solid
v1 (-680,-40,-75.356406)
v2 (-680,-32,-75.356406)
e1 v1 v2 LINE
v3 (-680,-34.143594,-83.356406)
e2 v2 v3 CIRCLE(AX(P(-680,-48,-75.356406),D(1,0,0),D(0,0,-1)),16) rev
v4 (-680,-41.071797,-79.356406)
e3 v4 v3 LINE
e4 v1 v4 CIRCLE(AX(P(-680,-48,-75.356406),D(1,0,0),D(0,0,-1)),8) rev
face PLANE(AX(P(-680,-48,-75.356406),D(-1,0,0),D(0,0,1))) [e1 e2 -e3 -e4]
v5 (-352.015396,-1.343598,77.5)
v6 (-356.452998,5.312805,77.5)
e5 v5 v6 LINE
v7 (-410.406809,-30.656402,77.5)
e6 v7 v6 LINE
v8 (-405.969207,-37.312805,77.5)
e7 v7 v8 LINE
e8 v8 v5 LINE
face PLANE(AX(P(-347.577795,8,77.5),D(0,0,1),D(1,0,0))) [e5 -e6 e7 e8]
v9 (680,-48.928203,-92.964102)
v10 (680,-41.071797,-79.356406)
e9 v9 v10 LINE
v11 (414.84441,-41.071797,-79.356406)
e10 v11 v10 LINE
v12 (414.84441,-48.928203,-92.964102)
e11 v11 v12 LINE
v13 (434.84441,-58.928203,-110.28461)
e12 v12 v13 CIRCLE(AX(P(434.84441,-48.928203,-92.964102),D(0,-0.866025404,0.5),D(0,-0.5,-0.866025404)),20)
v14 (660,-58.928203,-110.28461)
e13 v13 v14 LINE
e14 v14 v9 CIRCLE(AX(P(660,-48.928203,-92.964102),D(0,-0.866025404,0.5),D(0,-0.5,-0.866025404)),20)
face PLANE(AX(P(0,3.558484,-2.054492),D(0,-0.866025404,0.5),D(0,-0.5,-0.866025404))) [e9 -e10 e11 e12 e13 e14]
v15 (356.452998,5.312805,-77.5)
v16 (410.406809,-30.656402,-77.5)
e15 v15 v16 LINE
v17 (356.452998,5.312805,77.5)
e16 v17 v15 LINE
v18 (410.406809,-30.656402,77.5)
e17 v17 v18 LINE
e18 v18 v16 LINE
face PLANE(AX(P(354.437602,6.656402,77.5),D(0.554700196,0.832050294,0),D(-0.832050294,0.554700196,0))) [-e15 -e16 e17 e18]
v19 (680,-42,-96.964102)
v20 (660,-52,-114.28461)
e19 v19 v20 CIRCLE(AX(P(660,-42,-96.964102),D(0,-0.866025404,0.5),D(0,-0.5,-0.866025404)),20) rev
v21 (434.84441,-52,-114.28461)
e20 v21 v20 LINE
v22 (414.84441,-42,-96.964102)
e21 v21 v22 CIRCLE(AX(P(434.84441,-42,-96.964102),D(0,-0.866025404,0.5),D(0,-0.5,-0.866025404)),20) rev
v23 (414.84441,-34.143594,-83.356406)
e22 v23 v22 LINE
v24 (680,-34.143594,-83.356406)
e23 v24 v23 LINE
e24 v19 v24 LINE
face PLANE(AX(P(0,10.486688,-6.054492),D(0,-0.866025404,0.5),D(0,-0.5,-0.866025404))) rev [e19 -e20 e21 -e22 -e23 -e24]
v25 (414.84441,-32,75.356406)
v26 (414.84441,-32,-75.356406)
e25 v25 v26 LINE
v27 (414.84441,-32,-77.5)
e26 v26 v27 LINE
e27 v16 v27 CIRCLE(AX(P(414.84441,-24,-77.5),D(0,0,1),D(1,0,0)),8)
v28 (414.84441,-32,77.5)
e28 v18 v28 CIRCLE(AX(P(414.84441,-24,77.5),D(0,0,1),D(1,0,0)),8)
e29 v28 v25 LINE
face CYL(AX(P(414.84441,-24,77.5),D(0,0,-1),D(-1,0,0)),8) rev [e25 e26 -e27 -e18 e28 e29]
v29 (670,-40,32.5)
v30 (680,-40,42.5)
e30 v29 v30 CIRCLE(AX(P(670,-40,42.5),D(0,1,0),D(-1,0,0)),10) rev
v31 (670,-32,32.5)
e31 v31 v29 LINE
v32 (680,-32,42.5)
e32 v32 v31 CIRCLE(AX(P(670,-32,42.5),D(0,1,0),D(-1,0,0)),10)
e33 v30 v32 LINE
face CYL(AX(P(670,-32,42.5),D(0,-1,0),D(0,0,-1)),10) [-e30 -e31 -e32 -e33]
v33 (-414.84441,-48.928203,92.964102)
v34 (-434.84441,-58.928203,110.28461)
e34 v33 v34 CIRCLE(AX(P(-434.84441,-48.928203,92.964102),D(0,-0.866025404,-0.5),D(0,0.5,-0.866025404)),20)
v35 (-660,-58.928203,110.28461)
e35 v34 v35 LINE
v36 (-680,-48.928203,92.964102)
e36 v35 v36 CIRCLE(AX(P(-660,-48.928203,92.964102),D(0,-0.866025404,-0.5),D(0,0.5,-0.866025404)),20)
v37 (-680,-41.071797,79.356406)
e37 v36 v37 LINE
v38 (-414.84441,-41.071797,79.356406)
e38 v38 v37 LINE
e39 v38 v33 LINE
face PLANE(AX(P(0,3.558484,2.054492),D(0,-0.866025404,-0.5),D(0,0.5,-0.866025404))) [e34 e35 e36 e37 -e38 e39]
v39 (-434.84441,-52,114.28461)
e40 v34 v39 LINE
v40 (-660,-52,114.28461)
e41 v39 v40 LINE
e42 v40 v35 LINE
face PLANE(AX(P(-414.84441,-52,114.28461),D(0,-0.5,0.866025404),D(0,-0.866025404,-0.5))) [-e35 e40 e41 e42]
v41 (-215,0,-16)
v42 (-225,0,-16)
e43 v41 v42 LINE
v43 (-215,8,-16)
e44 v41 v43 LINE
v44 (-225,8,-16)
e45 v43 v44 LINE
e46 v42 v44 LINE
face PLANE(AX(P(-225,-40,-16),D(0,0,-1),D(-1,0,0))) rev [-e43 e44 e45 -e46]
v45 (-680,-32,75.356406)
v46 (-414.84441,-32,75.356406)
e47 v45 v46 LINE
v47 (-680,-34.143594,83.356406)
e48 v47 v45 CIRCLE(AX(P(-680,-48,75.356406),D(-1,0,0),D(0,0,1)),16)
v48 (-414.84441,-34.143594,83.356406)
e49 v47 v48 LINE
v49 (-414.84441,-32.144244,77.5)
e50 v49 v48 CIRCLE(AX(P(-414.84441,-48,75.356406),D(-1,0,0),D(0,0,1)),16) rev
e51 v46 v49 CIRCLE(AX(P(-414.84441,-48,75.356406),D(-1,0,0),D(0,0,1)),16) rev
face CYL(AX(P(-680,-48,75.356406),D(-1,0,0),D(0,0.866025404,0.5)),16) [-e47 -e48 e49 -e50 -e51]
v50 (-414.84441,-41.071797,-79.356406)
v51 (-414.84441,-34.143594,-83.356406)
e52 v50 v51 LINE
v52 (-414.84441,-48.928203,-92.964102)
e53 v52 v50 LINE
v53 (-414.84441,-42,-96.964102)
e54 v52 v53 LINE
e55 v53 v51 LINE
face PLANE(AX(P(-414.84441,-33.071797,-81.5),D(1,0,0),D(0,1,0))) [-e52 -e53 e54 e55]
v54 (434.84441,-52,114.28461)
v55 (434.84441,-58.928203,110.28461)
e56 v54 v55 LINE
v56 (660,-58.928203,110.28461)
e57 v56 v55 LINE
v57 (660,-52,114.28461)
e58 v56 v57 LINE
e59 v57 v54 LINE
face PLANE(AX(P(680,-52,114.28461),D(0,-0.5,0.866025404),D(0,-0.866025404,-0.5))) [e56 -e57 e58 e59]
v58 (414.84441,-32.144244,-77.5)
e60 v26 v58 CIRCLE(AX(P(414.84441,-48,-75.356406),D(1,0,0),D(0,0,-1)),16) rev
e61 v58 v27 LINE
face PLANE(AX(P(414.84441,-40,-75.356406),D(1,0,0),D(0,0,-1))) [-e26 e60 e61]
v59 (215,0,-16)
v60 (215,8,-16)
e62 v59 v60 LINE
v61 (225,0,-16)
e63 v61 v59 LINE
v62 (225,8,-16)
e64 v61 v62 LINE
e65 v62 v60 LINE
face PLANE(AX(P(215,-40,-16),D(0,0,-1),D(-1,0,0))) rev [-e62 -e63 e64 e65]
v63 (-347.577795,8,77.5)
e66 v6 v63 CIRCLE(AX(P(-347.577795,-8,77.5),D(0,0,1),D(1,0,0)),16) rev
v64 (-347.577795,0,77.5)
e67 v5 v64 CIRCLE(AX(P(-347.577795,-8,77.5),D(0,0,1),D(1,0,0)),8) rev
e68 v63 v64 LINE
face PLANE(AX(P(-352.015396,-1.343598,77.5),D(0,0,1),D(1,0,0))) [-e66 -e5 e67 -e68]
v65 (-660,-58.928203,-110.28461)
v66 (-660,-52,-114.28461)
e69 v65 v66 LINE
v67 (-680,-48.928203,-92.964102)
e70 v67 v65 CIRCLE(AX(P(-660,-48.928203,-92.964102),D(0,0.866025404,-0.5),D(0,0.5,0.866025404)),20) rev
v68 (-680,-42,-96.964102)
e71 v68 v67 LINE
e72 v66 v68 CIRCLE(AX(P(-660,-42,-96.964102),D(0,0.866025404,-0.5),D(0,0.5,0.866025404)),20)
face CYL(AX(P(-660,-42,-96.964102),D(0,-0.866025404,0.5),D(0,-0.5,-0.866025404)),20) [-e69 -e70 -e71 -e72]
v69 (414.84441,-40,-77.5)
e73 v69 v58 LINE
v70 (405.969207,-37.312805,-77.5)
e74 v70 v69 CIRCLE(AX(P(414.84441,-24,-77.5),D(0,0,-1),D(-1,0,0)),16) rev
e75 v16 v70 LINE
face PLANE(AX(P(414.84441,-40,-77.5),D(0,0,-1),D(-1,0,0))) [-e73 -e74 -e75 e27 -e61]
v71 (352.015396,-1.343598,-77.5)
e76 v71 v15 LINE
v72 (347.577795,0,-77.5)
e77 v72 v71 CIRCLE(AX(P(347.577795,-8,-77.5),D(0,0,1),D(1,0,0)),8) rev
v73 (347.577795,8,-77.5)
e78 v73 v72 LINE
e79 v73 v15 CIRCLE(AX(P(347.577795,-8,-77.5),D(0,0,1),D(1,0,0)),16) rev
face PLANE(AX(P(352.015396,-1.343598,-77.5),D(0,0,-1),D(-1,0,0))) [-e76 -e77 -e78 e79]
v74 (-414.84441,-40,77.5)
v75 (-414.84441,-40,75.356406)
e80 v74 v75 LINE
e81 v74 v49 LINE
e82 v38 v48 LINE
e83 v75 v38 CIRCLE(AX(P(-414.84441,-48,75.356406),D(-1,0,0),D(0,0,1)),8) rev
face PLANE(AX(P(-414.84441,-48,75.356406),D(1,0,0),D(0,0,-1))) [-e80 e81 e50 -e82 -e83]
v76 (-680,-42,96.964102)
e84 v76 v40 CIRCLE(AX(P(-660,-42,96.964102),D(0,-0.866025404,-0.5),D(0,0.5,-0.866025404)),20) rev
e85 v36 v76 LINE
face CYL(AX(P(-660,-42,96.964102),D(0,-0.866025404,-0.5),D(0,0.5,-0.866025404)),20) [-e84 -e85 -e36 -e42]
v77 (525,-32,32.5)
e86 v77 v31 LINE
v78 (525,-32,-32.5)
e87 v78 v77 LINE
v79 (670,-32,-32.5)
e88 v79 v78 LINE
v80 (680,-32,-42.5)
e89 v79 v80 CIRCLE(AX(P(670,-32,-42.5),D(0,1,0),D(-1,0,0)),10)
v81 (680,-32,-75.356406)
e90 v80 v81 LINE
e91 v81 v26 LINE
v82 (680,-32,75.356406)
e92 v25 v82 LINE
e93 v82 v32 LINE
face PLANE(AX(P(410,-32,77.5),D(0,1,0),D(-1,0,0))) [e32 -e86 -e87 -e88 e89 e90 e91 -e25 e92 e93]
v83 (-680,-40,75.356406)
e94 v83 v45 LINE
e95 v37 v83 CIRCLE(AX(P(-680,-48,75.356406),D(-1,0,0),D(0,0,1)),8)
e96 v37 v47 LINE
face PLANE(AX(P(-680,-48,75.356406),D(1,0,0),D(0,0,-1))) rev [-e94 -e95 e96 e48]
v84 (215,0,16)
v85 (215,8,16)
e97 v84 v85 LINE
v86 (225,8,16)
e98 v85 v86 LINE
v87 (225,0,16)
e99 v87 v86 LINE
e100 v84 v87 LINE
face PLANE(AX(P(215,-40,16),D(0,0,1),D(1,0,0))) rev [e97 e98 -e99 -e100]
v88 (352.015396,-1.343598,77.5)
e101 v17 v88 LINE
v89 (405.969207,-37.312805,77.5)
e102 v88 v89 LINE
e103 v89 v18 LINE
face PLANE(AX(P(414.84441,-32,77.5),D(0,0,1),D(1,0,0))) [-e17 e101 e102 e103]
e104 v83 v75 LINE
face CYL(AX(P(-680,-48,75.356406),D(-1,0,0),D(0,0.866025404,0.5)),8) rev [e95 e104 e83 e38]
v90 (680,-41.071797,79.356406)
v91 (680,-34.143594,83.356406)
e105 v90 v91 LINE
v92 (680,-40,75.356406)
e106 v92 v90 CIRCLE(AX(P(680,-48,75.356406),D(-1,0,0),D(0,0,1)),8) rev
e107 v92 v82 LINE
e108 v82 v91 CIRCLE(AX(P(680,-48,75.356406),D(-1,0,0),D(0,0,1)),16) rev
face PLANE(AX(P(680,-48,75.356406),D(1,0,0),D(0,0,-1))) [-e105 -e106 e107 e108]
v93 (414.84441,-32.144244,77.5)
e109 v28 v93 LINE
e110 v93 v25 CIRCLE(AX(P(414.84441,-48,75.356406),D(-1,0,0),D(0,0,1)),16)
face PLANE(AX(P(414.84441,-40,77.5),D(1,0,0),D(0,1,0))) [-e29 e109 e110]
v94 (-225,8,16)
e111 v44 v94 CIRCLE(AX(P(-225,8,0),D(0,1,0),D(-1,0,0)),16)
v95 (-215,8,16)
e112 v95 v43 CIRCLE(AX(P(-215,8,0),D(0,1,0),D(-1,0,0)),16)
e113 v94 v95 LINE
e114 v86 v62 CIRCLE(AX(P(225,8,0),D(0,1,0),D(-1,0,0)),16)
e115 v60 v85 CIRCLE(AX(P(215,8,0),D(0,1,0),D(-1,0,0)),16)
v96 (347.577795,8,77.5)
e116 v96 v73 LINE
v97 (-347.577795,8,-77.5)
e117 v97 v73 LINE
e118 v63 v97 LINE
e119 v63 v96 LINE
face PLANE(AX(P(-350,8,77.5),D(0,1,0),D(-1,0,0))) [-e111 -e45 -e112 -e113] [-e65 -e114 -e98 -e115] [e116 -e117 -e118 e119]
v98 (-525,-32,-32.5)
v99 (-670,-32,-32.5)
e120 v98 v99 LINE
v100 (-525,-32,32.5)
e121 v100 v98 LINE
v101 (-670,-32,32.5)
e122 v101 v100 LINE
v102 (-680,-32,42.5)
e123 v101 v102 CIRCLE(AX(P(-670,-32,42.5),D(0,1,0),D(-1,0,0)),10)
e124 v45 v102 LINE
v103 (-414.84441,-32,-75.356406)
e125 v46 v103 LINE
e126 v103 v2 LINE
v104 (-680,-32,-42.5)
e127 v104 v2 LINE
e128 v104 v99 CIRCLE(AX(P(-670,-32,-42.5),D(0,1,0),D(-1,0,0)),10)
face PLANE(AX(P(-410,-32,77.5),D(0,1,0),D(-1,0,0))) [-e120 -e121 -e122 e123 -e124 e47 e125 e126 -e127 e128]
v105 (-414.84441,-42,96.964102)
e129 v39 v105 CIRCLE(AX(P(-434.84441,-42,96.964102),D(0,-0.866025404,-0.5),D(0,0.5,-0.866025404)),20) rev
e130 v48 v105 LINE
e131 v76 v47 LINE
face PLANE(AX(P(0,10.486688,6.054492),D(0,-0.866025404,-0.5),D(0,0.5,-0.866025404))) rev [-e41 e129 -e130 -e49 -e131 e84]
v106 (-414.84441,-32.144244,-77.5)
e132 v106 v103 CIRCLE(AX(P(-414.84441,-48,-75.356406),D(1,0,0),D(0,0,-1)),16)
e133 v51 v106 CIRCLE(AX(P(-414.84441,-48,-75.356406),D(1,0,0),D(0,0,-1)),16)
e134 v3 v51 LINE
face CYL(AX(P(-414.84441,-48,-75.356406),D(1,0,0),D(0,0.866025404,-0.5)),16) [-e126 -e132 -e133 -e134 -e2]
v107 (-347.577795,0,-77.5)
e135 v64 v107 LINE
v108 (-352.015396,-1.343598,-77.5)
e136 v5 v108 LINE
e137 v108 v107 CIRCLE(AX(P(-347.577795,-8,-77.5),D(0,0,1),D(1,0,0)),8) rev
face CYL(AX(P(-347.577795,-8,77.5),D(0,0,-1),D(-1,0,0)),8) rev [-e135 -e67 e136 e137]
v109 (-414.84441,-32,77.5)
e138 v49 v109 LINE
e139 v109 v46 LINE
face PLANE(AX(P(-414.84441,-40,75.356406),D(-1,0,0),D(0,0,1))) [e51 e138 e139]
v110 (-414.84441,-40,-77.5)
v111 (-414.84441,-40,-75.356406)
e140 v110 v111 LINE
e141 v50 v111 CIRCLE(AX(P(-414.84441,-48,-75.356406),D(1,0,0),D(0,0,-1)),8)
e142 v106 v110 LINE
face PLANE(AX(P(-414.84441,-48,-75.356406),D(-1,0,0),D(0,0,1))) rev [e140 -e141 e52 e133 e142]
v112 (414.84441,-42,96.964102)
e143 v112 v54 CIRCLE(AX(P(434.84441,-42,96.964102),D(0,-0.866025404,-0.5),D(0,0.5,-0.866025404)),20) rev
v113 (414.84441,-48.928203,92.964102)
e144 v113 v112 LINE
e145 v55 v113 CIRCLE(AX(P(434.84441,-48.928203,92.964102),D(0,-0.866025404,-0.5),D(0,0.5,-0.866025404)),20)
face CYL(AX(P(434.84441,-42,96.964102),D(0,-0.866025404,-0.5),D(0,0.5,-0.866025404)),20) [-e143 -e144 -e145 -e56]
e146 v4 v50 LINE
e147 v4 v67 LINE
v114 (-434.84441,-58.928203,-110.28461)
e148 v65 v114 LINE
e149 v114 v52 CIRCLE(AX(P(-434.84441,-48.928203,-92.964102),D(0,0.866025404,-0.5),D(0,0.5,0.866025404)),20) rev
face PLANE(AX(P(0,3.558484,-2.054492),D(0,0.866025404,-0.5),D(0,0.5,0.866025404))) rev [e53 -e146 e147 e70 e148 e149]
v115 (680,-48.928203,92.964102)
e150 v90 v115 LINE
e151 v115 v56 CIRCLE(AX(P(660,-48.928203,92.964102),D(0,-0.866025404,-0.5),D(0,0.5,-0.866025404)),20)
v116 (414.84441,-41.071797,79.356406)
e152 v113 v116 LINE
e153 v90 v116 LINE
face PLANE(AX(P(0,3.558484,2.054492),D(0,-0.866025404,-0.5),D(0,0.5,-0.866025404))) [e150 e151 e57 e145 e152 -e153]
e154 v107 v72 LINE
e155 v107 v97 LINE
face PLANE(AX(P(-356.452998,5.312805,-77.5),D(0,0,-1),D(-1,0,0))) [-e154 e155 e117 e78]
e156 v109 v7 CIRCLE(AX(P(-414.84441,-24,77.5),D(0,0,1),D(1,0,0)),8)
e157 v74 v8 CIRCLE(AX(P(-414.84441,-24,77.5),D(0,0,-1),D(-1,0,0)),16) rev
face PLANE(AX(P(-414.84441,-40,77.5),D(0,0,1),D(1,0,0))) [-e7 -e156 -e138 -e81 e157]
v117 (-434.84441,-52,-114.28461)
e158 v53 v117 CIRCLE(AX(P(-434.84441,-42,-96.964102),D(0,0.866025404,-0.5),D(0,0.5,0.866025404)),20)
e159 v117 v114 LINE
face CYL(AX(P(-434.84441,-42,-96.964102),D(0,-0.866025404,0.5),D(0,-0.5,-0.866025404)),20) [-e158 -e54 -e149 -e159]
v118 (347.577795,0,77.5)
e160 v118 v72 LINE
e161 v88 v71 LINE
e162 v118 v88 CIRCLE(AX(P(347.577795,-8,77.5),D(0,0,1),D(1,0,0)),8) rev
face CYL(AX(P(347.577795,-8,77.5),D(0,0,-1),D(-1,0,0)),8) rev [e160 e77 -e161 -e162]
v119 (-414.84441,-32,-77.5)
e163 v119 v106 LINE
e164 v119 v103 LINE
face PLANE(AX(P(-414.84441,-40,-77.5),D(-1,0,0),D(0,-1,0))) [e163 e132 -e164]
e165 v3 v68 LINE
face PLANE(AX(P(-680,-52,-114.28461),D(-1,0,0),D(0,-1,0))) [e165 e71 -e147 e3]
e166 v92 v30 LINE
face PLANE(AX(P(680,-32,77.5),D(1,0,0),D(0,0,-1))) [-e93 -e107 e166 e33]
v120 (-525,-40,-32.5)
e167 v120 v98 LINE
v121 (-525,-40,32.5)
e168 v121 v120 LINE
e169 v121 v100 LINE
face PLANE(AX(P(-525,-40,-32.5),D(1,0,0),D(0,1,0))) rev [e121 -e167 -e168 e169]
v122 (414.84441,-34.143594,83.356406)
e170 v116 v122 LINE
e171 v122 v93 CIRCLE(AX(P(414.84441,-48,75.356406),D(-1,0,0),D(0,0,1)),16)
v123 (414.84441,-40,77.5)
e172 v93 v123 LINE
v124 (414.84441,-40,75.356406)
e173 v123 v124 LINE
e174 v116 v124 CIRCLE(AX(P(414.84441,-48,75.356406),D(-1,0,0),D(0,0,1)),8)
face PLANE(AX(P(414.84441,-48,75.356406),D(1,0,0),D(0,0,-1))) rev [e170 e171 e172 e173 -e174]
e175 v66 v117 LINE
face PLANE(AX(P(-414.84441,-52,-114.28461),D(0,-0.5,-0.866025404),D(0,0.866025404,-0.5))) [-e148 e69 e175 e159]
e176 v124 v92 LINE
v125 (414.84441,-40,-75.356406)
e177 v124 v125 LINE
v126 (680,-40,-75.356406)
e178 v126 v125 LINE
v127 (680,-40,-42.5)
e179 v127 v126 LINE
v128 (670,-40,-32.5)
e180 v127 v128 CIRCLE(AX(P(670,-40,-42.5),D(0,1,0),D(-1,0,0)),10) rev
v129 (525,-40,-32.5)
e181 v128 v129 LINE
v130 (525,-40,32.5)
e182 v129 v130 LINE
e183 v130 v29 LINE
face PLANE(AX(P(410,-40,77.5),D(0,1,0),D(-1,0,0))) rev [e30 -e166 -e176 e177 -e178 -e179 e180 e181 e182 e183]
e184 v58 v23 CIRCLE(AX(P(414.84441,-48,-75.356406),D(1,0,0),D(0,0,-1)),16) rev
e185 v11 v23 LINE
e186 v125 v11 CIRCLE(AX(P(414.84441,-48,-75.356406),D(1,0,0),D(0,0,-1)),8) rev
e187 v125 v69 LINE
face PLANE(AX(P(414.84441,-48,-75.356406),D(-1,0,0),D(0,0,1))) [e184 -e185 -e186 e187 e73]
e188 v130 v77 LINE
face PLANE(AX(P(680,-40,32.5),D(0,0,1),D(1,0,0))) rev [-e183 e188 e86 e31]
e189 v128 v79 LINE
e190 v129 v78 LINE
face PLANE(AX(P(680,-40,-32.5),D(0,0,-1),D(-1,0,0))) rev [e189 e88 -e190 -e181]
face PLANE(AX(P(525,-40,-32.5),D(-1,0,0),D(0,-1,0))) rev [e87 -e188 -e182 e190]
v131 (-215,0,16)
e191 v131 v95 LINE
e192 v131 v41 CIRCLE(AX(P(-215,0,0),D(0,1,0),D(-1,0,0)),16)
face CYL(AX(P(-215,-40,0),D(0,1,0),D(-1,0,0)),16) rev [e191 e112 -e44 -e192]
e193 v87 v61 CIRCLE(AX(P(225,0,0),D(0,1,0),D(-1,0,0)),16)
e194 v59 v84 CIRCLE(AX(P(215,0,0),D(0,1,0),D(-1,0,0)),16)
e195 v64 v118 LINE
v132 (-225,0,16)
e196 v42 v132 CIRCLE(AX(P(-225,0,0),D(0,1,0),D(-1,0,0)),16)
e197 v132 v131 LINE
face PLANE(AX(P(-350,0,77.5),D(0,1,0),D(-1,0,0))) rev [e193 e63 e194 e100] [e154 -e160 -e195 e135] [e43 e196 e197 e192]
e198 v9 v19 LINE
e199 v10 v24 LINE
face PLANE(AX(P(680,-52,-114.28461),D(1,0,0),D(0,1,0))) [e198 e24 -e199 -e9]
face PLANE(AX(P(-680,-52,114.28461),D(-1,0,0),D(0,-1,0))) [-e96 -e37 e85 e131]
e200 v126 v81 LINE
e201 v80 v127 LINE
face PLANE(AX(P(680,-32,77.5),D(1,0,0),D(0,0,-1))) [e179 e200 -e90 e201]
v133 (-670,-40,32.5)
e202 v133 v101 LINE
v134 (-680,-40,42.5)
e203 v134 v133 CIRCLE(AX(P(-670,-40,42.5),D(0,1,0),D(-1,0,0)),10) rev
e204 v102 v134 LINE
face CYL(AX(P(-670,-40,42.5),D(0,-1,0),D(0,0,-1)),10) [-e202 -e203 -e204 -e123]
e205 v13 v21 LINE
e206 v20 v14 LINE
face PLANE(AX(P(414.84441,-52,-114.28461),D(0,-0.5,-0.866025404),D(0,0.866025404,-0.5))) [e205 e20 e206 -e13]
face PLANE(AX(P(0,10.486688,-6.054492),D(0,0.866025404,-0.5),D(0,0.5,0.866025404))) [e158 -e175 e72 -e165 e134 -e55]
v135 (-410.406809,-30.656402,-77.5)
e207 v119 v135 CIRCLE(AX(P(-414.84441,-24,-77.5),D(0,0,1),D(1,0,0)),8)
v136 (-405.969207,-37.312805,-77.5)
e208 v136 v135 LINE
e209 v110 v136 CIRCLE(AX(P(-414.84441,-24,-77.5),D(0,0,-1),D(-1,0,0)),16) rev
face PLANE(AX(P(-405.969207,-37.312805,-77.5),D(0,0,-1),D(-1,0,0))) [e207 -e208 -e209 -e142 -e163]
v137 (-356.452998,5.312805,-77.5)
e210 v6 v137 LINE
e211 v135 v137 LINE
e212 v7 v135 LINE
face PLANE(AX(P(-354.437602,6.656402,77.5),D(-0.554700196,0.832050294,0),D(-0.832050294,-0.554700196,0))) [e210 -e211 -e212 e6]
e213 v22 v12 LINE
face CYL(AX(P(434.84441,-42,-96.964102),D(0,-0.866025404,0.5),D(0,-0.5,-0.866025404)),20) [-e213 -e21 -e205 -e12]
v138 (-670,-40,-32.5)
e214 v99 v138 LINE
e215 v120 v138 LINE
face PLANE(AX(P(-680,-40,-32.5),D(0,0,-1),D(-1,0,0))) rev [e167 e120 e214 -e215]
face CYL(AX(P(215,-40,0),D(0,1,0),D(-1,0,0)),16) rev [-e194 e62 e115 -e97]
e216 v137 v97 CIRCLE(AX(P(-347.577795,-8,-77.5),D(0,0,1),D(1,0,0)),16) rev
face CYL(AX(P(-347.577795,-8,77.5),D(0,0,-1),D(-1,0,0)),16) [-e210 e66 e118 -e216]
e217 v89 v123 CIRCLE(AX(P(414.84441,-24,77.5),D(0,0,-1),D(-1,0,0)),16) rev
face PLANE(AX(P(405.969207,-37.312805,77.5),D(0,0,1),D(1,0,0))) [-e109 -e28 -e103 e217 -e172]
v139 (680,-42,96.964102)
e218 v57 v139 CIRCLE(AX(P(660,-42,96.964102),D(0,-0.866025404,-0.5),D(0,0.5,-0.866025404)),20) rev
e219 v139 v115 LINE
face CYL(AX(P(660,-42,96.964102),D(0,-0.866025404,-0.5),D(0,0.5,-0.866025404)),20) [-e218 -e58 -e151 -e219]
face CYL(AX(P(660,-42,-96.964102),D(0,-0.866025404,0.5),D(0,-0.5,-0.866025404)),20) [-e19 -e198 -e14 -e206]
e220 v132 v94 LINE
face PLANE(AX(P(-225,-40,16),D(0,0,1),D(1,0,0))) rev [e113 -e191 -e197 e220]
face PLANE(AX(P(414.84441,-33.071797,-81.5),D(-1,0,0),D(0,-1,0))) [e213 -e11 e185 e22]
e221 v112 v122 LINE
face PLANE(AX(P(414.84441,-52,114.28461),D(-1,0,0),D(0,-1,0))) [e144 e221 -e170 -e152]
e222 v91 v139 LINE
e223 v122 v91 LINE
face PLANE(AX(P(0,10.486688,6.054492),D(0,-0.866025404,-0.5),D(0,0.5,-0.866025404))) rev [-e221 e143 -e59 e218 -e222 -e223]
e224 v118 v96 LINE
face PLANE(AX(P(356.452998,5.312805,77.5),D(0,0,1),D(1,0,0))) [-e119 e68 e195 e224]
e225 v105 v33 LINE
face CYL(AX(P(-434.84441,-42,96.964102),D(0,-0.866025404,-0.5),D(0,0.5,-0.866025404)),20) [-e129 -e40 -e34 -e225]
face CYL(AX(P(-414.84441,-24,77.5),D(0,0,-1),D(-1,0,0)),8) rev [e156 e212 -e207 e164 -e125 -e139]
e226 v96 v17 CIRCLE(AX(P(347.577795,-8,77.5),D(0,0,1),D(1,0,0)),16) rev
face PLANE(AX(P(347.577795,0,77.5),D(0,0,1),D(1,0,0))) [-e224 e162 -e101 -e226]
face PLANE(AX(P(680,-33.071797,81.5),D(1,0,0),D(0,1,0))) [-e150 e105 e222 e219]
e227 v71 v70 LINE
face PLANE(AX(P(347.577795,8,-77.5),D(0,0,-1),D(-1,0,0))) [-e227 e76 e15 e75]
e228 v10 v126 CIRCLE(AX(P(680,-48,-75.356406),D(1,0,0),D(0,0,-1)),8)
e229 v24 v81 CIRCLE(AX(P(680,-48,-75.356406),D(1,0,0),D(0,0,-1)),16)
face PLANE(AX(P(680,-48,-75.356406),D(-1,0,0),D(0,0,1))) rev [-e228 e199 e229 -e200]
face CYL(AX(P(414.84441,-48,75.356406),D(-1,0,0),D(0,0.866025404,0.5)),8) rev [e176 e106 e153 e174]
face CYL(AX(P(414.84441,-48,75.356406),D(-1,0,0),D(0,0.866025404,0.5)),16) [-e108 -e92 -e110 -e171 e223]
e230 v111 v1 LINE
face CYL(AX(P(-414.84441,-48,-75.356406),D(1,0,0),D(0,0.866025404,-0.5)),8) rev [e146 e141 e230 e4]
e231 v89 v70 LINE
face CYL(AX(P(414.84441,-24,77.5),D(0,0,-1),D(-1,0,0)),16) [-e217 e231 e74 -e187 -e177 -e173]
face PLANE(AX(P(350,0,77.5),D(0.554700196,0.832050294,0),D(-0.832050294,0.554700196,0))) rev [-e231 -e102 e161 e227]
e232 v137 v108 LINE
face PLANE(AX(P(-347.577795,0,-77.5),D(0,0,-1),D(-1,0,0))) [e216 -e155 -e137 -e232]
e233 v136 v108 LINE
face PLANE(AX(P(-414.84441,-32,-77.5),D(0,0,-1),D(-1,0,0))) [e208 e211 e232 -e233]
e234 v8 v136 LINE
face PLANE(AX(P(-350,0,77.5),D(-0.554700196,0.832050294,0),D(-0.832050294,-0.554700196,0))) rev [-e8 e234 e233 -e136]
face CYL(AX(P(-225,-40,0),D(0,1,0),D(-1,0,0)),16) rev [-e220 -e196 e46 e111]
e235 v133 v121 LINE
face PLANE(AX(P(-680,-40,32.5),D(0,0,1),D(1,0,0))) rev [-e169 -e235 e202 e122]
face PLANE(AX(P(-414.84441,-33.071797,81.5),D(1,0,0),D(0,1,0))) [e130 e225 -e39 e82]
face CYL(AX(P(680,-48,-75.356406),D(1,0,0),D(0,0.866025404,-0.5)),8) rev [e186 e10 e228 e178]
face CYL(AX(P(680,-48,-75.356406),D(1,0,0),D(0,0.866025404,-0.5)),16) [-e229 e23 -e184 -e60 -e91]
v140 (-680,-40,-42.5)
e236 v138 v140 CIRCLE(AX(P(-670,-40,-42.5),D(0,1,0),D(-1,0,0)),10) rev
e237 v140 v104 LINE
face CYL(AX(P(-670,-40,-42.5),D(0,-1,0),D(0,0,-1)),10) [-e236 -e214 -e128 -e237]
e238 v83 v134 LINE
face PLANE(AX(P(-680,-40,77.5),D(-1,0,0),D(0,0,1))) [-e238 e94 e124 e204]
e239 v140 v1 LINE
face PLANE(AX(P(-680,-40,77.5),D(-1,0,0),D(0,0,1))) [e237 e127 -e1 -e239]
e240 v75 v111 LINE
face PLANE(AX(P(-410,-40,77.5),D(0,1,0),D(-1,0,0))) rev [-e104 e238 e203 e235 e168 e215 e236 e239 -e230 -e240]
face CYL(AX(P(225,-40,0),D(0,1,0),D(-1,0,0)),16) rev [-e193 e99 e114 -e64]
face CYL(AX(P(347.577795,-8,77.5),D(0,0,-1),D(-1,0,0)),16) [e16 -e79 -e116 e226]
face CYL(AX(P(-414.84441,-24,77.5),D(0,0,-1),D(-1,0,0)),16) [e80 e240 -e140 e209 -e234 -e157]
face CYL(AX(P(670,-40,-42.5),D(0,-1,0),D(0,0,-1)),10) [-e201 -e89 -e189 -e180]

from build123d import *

# Parameters (mm, degrees)
SM_BASE_FLANGE_1_DEPTH             = 77.5
SKETCH_6_W                         = 155
SKETCH_6_H                         = 65
CUT_EXTRUDE_1_DEPTH                = 687.083267541
CUT_EXTRUDE_2_DEPTH                = 687.083267541
SM_EDGE_FLANGE_2_STRIP_CUT_DEPTH   = 265.155589796
SM_EDGE_FLANGE_2_STRIP_CUT_2_DEPTH = 265.155589796
SM_EDGE_FLANGE_2_STRIP_CUT_3_DEPTH = 265.155589796
SM_EDGE_FLANGE_2_STRIP_CUT_4_DEPTH = 265.155589796
SM_EDGE_FLANGE_2_DEPTH             = 265.155589796
SM_EDGE_FLANGE_2_BEND_DEPTH        = 265.155589796
SM_EDGE_FLANGE_2_BEND_2_DEPTH      = 265.155589796
SM_EDGE_FLANGE_2_BEND_3_DEPTH      = 265.155589796
FILLET_1_R                         = 10
FILLET_2_R                         = 20


# Sheet-metal steps are written as plain solids
with BuildPart() as part:
    # Sketch 1 → 基体-法兰1 (new, symmetric)
    with BuildSketch(Plane.XY):
        with BuildLine():
            Line((-680, -40), (-414.844410204, -40))
            ThreePointArc((-414.844410204, -40), (-410.207863825, -39.313472424), (-405.969207064, -37.312804709))
            Line((-405.969207064, -37.312804709), (-352.015396468, -1.343597645))
            ThreePointArc((-352.015396468, -1.343597645), (-349.896068088, -0.343263788), (-347.577794898, 0))
            Line((-347.577794898, 0), (347.577794898, 0))
            ThreePointArc((347.577794898, 0), (349.896068088, -0.343263788), (352.015396468, -1.343597645))
            Line((352.015396468, -1.343597645), (405.969207064, -37.312804709))
            ThreePointArc((405.969207064, -37.312804709), (410.207863825, -39.313472424), (414.844410204, -40))
            Line((414.844410204, -40), (680, -40))
            Line((680, -40), (680, -32))
            Line((680, -32), (414.844410204, -32))
            ThreePointArc((414.844410204, -32), (412.526137014, -31.656736212), (410.406808634, -30.656402355))
            Line((410.406808634, -30.656402355), (356.452998038, 5.312804709))
            ThreePointArc((356.452998038, 5.312804709), (352.214341277, 7.313472424), (347.577794898, 8))
            Line((347.577794898, 8), (-347.577794898, 8))
            ThreePointArc((-347.577794898, 8), (-352.214341277, 7.313472424), (-356.452998038, 5.312804709))
            Line((-356.452998038, 5.312804709), (-410.406808634, -30.656402355))
            ThreePointArc((-410.406808634, -30.656402355), (-412.526137014, -31.656736212), (-414.844410204, -32))
            Line((-414.844410204, -32), (-680, -32))
            Line((-680, -32), (-680, -40))
        make_face()
    extrude(amount=SM_BASE_FLANGE_1_DEPTH, both=True)

    # 草图6 → 切除-拉伸1 (cut, through all)
    with BuildSketch(Plane(origin=(0, 8, 0), x_dir=(1, 0, 0), z_dir=(0, 1, 0))):
        with Locations((-602.5, 0)):
            Rectangle(SKETCH_6_W, SKETCH_6_H)
        with Locations((602.5, 0)):
            Rectangle(SKETCH_6_W, SKETCH_6_H)
    extrude(amount=-CUT_EXTRUDE_1_DEPTH, mode=Mode.SUBTRACT)

    # 草图7 → 切除-拉伸2 (cut, through all)
    with BuildSketch(Plane(origin=(0, 8, 0), x_dir=(1, 0, 0), z_dir=(0, 1, 0))):
        with BuildLine():
            Line((-225, 16), (-215, 16))
            ThreePointArc((-215, 16), (-199, 0), (-215, -16))
            Line((-215, -16), (-225, -16))
            ThreePointArc((-225, -16), (-241, 0), (-225, 16))
        make_face()
        with BuildLine():
            Line((215, 16), (225, 16))
            ThreePointArc((225, 16), (241, 0), (225, -16))
            Line((225, -16), (215, -16))
            ThreePointArc((215, -16), (199, 0), (215, 16))
        make_face()
    extrude(amount=-CUT_EXTRUDE_2_DEPTH, mode=Mode.SUBTRACT)

    # 边线-法兰2 strip (across the edge) → 边线-法兰2 strip cut (cut)
    with BuildSketch(Plane(origin=(-680, -40, -77.5), x_dir=(0, -0.8660254037844416, 0.49999999999999495), z_dir=(1, 0, 0))):
        Polygon((-29.856406461, 35.712812921), (-5.856406461, -5.856406461), (1.07179677, -1.856406461), (-22.92820323, 39.712812921), align=None)
    extrude(amount=SM_EDGE_FLANGE_2_STRIP_CUT_DEPTH, mode=Mode.SUBTRACT)

    # 边线-法兰2 strip 2 (across the edge) → 边线-法兰2 strip cut 2 (cut)
    with BuildSketch(Plane(origin=(680, -40, 77.5), x_dir=(0, -0.8660254037844416, -0.49999999999999495), z_dir=(-1, 0, 0))):
        Polygon((-29.856406461, 35.712812921), (-5.856406461, -5.856406461), (1.07179677, -1.856406461), (-22.92820323, 39.712812921), align=None)
    extrude(amount=SM_EDGE_FLANGE_2_STRIP_CUT_2_DEPTH, mode=Mode.SUBTRACT)

    # 边线-法兰2 strip 3 (across the edge) → 边线-法兰2 strip cut 3 (cut)
    with BuildSketch(Plane(origin=(414.844410204, -40, -77.5), x_dir=(0, -0.8660254037844416, 0.49999999999999495), z_dir=(1, 0, 0))):
        Polygon((-29.856406461, 35.712812921), (-5.856406461, -5.856406461), (1.07179677, -1.856406461), (-22.92820323, 39.712812921), align=None)
    extrude(amount=SM_EDGE_FLANGE_2_STRIP_CUT_3_DEPTH, mode=Mode.SUBTRACT)

    # 边线-法兰2 strip 4 (across the edge) → 边线-法兰2 strip cut 4 (cut)
    with BuildSketch(Plane(origin=(-414.844410204, -40, 77.5), x_dir=(0, -0.8660254037844416, -0.49999999999999495), z_dir=(-1, 0, 0))):
        Polygon((-29.856406461, 35.712812921), (-5.856406461, -5.856406461), (1.07179677, -1.856406461), (-22.92820323, 39.712812921), align=None)
    extrude(amount=SM_EDGE_FLANGE_2_STRIP_CUT_4_DEPTH, mode=Mode.SUBTRACT)

    # 边线-法兰2 section (across the edge) → 边线-法兰2 (add)
    with BuildSketch(Plane(origin=(-680, -40, -77.5), x_dir=(0, -0.8660254037844416, 0.49999999999999495), z_dir=(1, 0, 0))):
        with BuildLine():
            Line((-8, 2.143593539), (-8, 37.856406461))
            Line((-8, 37.856406461), (0, 37.856406461))
            Line((0, 37.856406461), (0, 2.143593539))
            ThreePointArc((0, 2.143593539), (0.27259339, 0.073041179), (1.07179677, -1.856406461))
            Line((1.07179677, -1.856406461), (-5.856406461, -5.856406461))
            ThreePointArc((-5.856406461, -5.856406461), (-7.454813221, -1.997511182), (-8, 2.143593539))
        make_face()
    extrude(amount=SM_EDGE_FLANGE_2_DEPTH)

    # 边线-法兰2 section 2 (across the edge) → 边线-法兰2 bend (add)
    with BuildSketch(Plane(origin=(680, -40, 77.5), x_dir=(0, -0.8660254037844416, -0.49999999999999495), z_dir=(-1, 0, 0))):
        with BuildLine():
            Line((-8, 2.143593539), (-8, 37.856406461))
            Line((-8, 37.856406461), (0, 37.856406461))
            Line((0, 37.856406461), (0, 2.143593539))
            ThreePointArc((0, 2.143593539), (0.27259339, 0.073041179), (1.07179677, -1.856406461))
            Line((1.07179677, -1.856406461), (-5.856406461, -5.856406461))
            ThreePointArc((-5.856406461, -5.856406461), (-7.454813221, -1.997511182), (-8, 2.143593539))
        make_face()
    extrude(amount=SM_EDGE_FLANGE_2_BEND_DEPTH)

    # 边线-法兰2 section 3 (across the edge) → 边线-法兰2 bend 2 (add)
    with BuildSketch(Plane(origin=(414.844410204, -40, -77.5), x_dir=(0, -0.8660254037844416, 0.49999999999999495), z_dir=(1, 0, 0))):
        with BuildLine():
            Line((-8, 2.143593539), (-8, 37.856406461))
            Line((-8, 37.856406461), (0, 37.856406461))
            Line((0, 37.856406461), (0, 2.143593539))
            ThreePointArc((0, 2.143593539), (0.27259339, 0.073041179), (1.07179677, -1.856406461))
            Line((1.07179677, -1.856406461), (-5.856406461, -5.856406461))
            ThreePointArc((-5.856406461, -5.856406461), (-7.454813221, -1.997511182), (-8, 2.143593539))
        make_face()
    extrude(amount=SM_EDGE_FLANGE_2_BEND_2_DEPTH)

    # 边线-法兰2 section 4 (across the edge) → 边线-法兰2 bend 3 (add)
    with BuildSketch(Plane(origin=(-414.844410204, -40, 77.5), x_dir=(0, -0.8660254037844416, -0.49999999999999495), z_dir=(-1, 0, 0))):
        with BuildLine():
            Line((-8, 2.143593539), (-8, 37.856406461))
            Line((-8, 37.856406461), (0, 37.856406461))
            Line((0, 37.856406461), (0, 2.143593539))
            ThreePointArc((0, 2.143593539), (0.27259339, 0.073041179), (1.07179677, -1.856406461))
            Line((1.07179677, -1.856406461), (-5.856406461, -5.856406461))
            ThreePointArc((-5.856406461, -5.856406461), (-7.454813221, -1.997511182), (-8, 2.143593539))
        make_face()
    extrude(amount=SM_EDGE_FLANGE_2_BEND_3_DEPTH)

    # 圆角1
    fillet_1_edges = [part.edges().sort_by_distance(p)[0] for p in [
        (-680, -36, 32.5),
        (-680, -36, -32.5),
        (680, -36, -32.5),
        (680, -36, 32.5),
    ]]
    fillet(fillet_1_edges, radius=FILLET_1_R)

    # 圆角2
    fillet_2_edges = [part.edges().sort_by_distance(p)[0] for p in [
        (-680, -55.464101615, -112.284609691),
        (-414.844410204, -55.464101615, -112.284609691),
        (680, -55.464101615, 112.284609691),
        (414.844410204, -55.464101615, 112.284609691),
        (414.844410204, -55.464101615, -112.284609691),
        (680, -55.464101615, -112.284609691),
        (-414.844410204, -55.464101615, 112.284609691),
        (-680, -55.464101615, 112.284609691),
    ]]
    fillet(fillet_2_edges, radius=FILLET_2_R)


solid = part.part
